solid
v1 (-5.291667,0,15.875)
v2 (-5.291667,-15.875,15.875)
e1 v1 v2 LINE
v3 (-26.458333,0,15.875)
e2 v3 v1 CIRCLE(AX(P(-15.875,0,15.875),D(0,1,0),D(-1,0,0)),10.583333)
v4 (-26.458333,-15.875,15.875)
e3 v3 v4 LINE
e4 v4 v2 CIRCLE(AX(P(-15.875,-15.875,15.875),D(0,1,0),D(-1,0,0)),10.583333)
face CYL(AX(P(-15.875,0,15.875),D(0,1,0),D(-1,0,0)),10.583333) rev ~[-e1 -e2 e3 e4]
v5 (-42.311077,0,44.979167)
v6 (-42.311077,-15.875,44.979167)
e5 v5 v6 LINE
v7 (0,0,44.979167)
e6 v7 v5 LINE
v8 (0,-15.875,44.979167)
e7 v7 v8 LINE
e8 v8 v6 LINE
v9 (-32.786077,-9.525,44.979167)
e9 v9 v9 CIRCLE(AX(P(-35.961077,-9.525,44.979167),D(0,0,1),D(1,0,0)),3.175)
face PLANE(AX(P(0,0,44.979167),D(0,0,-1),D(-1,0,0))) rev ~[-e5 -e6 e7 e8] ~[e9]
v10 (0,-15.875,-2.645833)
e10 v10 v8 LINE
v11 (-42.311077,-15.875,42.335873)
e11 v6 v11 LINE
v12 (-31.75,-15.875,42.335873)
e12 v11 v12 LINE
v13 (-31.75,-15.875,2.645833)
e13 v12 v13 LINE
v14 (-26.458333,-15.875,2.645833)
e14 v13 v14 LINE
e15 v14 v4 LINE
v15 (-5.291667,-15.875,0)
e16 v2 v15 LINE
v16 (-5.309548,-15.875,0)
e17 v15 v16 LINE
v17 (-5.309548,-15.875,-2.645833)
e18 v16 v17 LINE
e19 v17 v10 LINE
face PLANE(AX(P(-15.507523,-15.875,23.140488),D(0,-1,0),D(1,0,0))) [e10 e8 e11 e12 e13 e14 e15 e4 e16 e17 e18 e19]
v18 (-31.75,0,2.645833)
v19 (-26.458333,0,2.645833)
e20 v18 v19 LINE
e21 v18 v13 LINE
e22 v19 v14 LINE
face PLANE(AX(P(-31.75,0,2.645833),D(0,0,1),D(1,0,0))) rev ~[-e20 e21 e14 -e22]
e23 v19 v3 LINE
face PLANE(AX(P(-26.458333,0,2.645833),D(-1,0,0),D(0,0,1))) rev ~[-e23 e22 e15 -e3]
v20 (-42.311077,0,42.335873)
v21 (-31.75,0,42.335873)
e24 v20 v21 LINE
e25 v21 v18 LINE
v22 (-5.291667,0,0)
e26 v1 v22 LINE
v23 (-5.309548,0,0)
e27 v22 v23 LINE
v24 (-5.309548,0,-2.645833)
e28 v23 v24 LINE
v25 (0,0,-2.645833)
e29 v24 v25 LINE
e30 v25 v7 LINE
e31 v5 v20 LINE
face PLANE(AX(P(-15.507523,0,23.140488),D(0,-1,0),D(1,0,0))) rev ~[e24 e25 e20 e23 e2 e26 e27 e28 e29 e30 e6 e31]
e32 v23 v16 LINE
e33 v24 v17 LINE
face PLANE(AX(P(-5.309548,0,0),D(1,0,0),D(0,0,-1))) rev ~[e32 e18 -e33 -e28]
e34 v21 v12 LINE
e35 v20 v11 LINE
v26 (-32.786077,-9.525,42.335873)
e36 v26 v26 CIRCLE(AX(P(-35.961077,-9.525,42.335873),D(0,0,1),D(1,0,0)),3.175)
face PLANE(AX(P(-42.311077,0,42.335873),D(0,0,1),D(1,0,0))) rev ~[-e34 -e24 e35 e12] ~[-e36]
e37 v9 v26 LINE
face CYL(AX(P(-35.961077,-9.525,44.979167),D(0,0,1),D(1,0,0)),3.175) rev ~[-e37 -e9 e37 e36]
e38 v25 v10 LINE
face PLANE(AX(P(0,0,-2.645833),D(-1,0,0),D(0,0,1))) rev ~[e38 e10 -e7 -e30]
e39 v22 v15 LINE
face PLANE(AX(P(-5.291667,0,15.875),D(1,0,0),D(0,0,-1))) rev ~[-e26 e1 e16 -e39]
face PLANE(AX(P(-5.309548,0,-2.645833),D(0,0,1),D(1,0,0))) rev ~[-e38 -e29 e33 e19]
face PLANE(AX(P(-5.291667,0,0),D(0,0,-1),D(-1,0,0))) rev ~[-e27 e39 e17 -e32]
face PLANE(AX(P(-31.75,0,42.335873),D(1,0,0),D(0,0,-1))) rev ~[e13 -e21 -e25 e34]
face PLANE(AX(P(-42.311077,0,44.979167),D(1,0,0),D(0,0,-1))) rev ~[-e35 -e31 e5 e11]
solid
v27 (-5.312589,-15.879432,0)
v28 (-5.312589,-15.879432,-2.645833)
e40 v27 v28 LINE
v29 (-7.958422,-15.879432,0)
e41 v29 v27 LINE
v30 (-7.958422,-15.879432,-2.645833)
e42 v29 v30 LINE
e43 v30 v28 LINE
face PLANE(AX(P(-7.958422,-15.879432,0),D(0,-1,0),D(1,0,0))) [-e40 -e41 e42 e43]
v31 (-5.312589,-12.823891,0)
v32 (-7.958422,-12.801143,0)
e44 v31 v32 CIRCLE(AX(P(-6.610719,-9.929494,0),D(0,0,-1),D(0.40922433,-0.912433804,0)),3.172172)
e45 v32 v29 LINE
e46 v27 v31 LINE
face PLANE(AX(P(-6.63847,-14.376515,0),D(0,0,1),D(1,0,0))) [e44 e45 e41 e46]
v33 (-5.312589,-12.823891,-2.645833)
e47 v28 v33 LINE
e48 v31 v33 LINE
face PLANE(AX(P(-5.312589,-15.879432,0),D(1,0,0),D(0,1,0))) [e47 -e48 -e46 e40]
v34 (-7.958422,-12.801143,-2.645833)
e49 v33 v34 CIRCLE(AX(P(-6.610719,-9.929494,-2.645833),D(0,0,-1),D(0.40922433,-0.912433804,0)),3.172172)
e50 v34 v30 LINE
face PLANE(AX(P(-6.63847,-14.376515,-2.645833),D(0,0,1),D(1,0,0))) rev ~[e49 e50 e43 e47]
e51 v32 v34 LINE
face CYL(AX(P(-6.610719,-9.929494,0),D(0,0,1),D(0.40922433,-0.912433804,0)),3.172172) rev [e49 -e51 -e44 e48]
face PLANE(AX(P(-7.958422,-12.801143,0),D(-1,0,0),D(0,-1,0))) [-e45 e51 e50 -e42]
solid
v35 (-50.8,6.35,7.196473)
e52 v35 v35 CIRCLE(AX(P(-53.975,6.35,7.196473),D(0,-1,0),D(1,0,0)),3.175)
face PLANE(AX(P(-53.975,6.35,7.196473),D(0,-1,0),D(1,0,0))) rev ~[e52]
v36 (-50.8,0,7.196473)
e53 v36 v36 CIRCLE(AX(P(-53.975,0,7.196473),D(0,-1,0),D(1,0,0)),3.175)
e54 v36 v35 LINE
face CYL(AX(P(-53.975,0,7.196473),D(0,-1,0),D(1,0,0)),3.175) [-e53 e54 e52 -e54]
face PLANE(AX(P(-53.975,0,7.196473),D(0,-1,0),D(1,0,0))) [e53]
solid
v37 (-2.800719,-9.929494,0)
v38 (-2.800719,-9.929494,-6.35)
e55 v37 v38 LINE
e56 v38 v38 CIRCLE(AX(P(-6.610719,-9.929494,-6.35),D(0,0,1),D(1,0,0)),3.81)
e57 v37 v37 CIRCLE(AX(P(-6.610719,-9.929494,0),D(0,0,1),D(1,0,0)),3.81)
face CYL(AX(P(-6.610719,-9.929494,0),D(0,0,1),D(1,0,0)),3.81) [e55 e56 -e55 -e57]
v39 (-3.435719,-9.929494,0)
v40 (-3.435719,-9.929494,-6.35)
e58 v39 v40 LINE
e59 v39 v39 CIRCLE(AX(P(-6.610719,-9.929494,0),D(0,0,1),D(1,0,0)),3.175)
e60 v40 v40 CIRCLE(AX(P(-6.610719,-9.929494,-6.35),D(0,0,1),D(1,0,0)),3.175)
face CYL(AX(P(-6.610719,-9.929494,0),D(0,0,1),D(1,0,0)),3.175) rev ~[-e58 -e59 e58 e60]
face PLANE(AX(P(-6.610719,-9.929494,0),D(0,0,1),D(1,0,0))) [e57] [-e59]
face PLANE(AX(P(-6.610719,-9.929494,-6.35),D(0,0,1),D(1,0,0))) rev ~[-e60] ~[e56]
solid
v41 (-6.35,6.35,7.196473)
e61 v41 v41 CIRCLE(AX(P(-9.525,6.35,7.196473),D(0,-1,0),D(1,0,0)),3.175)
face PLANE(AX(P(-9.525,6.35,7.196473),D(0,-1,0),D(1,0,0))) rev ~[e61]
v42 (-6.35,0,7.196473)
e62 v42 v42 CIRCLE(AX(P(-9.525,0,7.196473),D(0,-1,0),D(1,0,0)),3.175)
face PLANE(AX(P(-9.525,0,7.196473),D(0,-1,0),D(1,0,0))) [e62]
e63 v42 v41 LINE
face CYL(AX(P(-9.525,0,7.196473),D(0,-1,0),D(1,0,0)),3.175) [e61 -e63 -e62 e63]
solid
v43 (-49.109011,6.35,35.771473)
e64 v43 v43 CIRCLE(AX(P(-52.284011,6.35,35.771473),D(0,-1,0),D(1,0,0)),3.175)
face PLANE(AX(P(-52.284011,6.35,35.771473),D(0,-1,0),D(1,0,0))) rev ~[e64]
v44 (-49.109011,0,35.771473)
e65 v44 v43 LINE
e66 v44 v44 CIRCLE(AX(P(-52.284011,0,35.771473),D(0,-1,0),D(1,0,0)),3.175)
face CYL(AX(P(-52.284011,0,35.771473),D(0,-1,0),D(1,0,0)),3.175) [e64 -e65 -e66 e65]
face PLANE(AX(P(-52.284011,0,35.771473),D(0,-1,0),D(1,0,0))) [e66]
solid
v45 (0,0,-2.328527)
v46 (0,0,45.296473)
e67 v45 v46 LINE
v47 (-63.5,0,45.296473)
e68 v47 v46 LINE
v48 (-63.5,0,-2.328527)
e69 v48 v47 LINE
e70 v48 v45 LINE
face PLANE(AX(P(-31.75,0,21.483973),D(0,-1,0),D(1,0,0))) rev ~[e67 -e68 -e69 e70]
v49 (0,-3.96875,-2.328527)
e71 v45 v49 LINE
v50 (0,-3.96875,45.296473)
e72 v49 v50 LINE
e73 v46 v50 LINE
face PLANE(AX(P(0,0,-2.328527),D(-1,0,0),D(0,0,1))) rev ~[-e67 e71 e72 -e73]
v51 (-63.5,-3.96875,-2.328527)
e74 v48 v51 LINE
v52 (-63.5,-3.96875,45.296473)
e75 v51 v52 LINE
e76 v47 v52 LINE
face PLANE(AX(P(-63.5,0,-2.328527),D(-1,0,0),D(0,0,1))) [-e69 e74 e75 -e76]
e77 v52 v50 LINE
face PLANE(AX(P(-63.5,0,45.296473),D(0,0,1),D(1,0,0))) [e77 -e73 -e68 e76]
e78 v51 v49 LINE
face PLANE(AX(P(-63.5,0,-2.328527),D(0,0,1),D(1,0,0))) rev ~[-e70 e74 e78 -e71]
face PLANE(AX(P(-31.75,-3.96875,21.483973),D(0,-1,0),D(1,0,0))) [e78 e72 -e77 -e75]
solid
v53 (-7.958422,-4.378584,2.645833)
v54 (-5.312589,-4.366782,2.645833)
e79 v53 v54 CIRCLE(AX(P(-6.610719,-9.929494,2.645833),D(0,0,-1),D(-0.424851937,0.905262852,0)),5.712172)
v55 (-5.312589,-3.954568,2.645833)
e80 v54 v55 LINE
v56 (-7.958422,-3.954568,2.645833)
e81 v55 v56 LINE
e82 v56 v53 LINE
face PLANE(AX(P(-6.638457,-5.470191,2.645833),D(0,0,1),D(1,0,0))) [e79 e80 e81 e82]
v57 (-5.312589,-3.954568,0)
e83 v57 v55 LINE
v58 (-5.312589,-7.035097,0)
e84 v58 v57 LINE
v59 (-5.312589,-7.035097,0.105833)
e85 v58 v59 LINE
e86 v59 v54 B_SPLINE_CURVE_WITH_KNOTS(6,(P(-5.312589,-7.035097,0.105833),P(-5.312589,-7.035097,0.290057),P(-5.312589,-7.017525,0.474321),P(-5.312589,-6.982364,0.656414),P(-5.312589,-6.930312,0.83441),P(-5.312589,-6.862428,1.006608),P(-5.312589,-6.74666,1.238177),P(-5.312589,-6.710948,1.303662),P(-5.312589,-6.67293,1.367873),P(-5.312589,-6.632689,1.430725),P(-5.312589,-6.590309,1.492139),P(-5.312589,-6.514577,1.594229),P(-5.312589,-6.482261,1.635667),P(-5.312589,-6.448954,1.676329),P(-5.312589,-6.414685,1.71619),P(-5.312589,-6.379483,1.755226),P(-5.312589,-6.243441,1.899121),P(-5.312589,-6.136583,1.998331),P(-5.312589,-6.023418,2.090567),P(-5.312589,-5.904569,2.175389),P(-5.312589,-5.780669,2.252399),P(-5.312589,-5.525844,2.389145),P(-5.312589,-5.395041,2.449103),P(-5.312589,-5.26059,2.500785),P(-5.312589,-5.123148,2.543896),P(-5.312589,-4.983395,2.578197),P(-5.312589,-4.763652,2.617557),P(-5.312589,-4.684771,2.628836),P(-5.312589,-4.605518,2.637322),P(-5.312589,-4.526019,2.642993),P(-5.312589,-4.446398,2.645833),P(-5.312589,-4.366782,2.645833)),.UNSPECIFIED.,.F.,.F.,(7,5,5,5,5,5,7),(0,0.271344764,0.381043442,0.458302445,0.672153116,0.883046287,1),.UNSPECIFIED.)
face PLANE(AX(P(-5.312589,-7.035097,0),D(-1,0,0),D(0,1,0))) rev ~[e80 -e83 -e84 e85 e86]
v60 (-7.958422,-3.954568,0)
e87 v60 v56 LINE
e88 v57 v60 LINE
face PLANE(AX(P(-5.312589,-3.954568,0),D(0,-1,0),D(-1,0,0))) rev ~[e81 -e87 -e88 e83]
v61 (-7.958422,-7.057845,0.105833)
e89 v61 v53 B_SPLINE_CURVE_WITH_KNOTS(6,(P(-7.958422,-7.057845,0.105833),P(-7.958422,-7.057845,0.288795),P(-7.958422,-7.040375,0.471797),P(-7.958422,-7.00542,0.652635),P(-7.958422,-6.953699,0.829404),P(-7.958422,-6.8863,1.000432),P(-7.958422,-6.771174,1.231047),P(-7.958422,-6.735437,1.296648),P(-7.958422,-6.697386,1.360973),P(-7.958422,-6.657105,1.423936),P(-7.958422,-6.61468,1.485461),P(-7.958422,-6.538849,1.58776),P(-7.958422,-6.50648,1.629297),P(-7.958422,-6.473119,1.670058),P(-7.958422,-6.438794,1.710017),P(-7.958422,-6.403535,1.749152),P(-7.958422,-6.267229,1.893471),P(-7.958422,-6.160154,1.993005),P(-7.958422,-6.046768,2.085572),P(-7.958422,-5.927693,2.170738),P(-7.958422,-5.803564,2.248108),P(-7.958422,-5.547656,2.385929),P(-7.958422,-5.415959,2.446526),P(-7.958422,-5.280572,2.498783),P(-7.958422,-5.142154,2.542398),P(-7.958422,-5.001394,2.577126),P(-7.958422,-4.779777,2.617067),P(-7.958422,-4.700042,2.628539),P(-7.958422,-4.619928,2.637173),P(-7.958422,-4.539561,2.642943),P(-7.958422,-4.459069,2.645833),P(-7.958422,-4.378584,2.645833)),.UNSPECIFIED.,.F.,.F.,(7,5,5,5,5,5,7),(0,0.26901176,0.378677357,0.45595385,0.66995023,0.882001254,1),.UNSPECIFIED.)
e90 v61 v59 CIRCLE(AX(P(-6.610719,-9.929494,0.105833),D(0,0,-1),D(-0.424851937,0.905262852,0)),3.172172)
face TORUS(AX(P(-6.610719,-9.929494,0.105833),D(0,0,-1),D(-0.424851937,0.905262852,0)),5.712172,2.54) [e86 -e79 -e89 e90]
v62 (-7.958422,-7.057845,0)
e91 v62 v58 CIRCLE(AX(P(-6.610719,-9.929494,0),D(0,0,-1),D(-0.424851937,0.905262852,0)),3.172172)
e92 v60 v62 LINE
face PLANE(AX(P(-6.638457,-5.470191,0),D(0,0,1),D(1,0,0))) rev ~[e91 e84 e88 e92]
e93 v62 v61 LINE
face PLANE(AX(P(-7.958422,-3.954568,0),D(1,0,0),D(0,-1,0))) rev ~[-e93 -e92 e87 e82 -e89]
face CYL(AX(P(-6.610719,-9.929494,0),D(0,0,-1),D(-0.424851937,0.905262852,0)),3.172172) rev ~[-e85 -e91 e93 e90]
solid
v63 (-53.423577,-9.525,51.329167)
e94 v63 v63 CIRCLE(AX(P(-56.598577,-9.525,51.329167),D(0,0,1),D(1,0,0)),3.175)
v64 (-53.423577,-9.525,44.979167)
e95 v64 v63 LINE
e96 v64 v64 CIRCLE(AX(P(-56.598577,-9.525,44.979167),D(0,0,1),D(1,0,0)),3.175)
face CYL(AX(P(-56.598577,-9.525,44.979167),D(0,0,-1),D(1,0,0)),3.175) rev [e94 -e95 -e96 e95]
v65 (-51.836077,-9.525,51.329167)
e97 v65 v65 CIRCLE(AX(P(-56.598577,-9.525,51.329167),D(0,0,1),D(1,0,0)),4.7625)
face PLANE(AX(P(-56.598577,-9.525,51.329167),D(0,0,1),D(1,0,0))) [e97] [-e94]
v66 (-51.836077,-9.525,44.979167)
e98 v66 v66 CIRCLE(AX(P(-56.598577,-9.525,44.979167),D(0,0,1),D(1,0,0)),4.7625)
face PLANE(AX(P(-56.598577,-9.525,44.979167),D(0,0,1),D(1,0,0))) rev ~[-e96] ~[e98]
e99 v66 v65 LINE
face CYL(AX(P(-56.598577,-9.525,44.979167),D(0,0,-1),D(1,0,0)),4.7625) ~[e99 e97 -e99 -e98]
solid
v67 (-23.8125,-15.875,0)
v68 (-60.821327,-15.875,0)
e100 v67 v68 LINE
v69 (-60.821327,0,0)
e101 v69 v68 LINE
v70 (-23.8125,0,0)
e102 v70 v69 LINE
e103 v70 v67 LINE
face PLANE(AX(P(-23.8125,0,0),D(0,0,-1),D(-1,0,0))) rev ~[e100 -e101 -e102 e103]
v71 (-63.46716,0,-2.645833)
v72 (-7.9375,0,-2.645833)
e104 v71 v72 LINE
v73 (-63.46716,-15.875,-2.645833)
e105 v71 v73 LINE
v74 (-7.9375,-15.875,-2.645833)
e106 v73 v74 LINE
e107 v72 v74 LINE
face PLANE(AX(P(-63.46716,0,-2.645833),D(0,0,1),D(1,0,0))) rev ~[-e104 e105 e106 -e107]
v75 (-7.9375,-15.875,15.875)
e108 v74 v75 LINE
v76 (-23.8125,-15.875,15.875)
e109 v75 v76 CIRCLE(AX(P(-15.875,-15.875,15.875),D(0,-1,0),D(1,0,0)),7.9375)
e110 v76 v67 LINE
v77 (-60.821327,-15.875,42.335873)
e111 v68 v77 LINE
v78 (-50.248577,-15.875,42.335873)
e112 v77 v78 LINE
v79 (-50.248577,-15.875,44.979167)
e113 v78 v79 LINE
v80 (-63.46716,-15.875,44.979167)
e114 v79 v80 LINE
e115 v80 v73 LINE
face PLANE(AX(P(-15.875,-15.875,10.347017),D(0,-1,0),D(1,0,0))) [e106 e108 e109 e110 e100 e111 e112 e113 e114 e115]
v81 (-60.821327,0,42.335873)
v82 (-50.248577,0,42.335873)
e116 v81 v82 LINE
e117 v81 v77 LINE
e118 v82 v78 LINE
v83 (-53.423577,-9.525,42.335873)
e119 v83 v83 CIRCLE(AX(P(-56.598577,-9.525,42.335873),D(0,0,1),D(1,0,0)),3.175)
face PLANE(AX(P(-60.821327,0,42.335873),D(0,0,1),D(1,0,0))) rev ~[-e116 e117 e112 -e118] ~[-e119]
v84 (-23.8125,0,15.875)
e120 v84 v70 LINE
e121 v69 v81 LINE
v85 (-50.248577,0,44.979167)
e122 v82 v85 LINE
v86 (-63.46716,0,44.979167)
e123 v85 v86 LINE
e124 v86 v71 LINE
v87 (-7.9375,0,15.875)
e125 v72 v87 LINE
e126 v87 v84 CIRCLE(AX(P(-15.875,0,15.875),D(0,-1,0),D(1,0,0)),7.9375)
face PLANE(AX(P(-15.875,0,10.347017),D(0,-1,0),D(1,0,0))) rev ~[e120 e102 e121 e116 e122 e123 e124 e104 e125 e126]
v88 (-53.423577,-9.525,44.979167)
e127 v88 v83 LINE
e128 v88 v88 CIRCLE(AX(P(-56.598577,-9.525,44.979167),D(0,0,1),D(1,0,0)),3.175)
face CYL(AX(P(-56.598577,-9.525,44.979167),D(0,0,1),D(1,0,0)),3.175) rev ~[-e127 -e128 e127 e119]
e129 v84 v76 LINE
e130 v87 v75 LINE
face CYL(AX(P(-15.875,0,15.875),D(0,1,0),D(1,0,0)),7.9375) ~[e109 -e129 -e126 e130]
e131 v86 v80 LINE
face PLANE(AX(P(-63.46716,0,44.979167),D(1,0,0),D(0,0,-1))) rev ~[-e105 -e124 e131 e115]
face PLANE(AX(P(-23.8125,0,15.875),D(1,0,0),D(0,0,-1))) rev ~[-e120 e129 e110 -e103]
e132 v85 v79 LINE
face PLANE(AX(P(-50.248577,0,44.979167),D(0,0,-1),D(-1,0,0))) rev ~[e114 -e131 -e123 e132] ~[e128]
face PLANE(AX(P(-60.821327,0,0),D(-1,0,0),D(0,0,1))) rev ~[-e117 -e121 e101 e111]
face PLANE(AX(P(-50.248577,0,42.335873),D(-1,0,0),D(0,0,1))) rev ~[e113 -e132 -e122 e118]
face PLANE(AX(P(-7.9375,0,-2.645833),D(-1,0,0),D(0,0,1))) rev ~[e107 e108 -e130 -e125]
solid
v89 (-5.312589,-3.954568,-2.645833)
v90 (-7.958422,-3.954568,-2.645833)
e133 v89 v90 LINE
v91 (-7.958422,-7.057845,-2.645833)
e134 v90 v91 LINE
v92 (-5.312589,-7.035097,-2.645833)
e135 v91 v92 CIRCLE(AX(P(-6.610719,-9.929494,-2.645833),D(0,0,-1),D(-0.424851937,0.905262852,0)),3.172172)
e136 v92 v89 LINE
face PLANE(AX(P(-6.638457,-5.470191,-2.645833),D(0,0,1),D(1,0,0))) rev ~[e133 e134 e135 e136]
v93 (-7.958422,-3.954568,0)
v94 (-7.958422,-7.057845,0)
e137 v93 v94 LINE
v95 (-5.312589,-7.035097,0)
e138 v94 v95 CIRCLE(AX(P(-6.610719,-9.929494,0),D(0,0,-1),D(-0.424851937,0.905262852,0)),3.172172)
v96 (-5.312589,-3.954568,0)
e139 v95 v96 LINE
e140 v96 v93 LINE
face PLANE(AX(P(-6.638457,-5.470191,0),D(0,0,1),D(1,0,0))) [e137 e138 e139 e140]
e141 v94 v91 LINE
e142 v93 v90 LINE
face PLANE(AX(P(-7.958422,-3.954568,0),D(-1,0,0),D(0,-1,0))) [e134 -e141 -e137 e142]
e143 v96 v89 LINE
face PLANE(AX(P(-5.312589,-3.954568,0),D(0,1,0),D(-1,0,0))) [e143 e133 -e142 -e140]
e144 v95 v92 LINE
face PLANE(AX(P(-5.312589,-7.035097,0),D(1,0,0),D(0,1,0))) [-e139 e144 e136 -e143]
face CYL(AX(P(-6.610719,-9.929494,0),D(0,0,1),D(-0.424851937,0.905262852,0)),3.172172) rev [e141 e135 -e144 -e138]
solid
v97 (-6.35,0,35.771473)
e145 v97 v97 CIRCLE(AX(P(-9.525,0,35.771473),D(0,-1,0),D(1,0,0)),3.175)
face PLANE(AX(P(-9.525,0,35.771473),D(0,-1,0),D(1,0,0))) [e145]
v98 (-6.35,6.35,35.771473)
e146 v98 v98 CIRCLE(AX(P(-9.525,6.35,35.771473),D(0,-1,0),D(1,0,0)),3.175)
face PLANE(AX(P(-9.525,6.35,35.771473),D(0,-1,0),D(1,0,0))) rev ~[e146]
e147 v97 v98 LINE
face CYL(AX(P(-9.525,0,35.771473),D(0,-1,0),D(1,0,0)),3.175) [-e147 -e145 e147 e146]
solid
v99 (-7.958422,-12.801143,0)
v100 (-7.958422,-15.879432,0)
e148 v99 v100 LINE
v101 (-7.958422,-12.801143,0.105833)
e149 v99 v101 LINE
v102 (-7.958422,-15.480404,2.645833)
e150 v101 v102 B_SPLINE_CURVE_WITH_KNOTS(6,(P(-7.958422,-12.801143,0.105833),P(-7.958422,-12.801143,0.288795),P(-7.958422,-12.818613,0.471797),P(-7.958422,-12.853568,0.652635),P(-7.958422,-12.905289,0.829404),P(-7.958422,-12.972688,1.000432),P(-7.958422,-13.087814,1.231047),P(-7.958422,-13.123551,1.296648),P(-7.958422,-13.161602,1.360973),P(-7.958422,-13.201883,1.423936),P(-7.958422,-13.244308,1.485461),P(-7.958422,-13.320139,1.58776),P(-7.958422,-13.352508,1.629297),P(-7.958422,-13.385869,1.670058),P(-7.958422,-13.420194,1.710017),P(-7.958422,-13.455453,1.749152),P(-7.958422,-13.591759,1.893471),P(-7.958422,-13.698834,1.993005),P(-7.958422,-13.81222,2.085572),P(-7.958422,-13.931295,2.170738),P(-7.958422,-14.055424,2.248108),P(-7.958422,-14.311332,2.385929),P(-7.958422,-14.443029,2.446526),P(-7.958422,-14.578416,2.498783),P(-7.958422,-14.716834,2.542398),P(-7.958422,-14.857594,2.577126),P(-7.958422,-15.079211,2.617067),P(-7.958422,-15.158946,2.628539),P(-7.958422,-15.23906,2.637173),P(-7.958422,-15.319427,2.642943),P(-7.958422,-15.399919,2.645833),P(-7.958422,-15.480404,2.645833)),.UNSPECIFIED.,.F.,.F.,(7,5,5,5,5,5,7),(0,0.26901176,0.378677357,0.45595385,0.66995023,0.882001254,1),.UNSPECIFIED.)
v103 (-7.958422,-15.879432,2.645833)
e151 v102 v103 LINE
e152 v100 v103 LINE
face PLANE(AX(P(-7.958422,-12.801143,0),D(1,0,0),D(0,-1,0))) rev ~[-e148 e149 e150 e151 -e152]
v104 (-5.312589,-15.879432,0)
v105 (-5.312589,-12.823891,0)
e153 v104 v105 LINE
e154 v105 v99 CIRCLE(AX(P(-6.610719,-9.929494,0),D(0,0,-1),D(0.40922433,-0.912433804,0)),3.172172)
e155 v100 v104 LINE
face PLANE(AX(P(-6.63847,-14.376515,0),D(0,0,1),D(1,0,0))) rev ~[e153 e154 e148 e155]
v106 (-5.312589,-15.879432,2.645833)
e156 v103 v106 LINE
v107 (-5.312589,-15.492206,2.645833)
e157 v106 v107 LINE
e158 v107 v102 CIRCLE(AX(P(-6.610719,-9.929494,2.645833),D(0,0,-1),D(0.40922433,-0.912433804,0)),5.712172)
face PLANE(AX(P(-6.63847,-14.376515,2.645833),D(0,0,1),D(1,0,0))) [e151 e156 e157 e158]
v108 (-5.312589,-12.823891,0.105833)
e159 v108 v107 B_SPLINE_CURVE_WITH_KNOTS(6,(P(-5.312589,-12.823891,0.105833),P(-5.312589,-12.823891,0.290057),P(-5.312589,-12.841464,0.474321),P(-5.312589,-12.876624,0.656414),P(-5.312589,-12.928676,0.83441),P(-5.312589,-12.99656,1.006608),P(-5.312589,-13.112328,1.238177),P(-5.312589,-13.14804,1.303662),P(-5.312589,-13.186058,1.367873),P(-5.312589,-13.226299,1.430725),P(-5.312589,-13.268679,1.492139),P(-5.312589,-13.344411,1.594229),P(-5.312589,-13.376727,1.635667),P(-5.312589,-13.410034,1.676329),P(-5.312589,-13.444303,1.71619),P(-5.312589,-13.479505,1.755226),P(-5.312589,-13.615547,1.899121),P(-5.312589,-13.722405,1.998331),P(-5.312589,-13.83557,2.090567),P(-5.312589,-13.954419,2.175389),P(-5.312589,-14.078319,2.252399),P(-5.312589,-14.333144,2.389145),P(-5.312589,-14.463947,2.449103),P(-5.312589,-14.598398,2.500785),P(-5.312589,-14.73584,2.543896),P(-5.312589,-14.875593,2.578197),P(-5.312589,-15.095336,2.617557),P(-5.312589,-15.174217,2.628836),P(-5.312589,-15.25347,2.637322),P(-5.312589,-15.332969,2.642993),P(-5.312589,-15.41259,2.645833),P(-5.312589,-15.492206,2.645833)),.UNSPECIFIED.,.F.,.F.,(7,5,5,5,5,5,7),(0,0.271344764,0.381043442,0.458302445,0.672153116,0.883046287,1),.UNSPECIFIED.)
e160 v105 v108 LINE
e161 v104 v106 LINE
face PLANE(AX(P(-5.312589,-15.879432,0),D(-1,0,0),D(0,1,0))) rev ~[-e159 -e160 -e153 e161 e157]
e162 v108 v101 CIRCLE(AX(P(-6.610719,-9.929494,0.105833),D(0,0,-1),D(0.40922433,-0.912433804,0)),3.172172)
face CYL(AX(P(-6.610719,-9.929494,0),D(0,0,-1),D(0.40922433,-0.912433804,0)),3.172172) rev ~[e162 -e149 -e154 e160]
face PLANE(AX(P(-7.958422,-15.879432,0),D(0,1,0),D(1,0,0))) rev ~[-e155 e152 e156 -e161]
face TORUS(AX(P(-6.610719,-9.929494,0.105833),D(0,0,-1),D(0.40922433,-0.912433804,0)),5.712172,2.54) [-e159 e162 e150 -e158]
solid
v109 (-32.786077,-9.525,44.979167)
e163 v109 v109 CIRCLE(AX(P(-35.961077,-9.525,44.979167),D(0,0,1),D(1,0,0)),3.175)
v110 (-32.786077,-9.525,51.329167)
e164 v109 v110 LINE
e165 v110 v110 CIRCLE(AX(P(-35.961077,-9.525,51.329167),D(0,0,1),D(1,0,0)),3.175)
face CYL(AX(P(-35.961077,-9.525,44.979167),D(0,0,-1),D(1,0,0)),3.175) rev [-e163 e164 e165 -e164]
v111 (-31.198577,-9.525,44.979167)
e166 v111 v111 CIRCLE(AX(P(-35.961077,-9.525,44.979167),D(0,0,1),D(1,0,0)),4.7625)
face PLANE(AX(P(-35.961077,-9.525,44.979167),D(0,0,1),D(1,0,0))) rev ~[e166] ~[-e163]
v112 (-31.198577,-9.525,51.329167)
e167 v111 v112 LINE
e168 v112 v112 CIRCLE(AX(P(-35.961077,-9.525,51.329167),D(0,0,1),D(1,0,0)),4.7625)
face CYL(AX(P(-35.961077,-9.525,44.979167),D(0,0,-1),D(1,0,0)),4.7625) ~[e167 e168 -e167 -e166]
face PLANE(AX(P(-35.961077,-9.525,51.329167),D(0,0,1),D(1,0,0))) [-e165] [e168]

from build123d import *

# Parameters (mm, degrees)
F1_DEPTH  = 15.875
F0_W      = 2.6458333332
F0_H      = 42.3358732487
F2_W      = 63.5
F2_H      = 47.625
F2_R      = 3.175
F3_DEPTH  = 3.96875
F4_DEPTH  = 6.35
F5_R      = 4.7625
F5_R_2    = 3.175
F6_DEPTH  = 6.35
F7_R      = 3.175
F8_DEPTH  = 25.4
F9_R      = 3.81
F9_R_2    = 3.175
F10_DEPTH = 6.35
F12_DEPTH = 2.645833164
F13_DEPTH = 2.6458333316
F14_R     = 2.54
F14_2_R   = 2.54


# Not quite as in the source:
# - a feature names something its author has since deleted; it is built from what else it names


with BuildPart() as f1:
    # F0 (on Front) → F1 (new body)
    with BuildSketch(Plane.XZ):
        with BuildLine():
            Line((0, 44.979166582), (-31.75, 44.979166582))
            Line((-31.75, 44.979166582), (-31.75, 42.3358732487))
            Line((-31.75, 42.3358732487), (-31.75, 2.6458333332))
            Line((-31.75, 2.6458333332), (-26.4583333333, 2.6458333332))
            Line((-26.4583333333, 2.6458333332), (-26.4583333333, 15.875))
            ThreePointArc((-26.4583333333, 15.875), (-15.875, 26.4583333333), (-5.2916666667, 15.875))
            Line((-5.2916666667, 15.875), (-5.2916666667, 0))
            Line((-5.2916666667, 0), (0, 0))
            Line((0, 0), (0, 44.979166582))
        make_face()
        Polygon((0, -2.6458333333), (0, 0), (-5.2916666667, 0), (-5.309548229, 0), (-5.309548229, -2.6458333333), align=None)
        Polygon((-31.75, 42.3358732487), (-31.75, 44.979166582), (-34.3958333316, 44.979166582), (-37.0416664956, 44.979166582), (-42.3110765377, 44.979166582), (-42.3110765377, 42.3358732487), (-37.0416664956, 42.3358732487), (-34.3958333316, 42.3358732487), align=None)
    extrude(amount=F1_DEPTH)


with BuildPart() as f1b:
    # F0 (on Front) → F1, piece 2 (new body)
    with BuildSketch(Plane.XZ):
        with BuildLine():
            Line((-23.8125, 0), (-7.9375, 0))
            Line((-7.9375, 0), (-7.9375, 15.875))
            ThreePointArc((-7.9375, 15.875), (-15.875, 23.8125), (-23.8125, 15.875))
            Line((-23.8125, 15.875), (-23.8125, 0))
        make_face()
        Polygon((-26.4583333333, 0), (-31.75, 0), (-60.8213265341, 0), (-63.4671598673, 0), (-63.4671598673, -2.6458333333), (-7.9375, -2.6458333333), (-7.9375, 0), (-23.8125, 0), align=None)
        with Locations((-62.1442432007, 21.1679366243)):
            Rectangle(F0_W, F0_H)
        Polygon((-50.2485765377, 42.3358732487), (-50.2485765377, 44.979166582), (-55.5296598693, 44.979166582), (-58.175493201, 44.979166582), (-63.4671598673, 44.979166582), (-63.4671598673, 42.3358732487), (-60.8213265341, 42.3358732487), (-58.175493201, 42.3358732487), (-55.5296598693, 42.3358732487), align=None)
    extrude(amount=F1_DEPTH)


with BuildPart() as f3:
    # F2 (on Front) → F3 (new body)
    with BuildSketch(Plane.XZ):
        with Locations((-31.75, 21.4839725468)):
            Rectangle(F2_W, F2_H)
        with Locations((-53.975, 7.1964725468)):
            Circle(F2_R, mode=Mode.SUBTRACT)
        with Locations((-9.525, 7.1964725468)):
            Circle(F2_R, mode=Mode.SUBTRACT)
        with Locations((-52.284011212, 35.7714725468)):
            Circle(F2_R, mode=Mode.SUBTRACT)
        with Locations((-9.525, 35.7714725468)):
            Circle(F2_R, mode=Mode.SUBTRACT)
        with Locations((-52.284011212, 35.7714725468)):
            Circle(F2_R)
        with Locations((-53.975, 7.1964725468)):
            Circle(F2_R)
        with Locations((-9.525, 7.1964725468)):
            Circle(F2_R)
        with Locations((-9.525, 35.7714725468)):
            Circle(F2_R)
    extrude(amount=F3_DEPTH)


with BuildPart() as f4:
    # F2 (on Front) → F4 (new body)
    with BuildSketch(Plane.XZ):
        with Locations((-9.525, 35.7714725468)):
            Circle(F2_R)
    extrude(amount=-F4_DEPTH)


with BuildPart() as f4b:
    # F2 (on Front) → F4, piece 2 (new body)
    with BuildSketch(Plane.XZ):
        with Locations((-52.284011212, 35.7714725468)):
            Circle(F2_R)
    extrude(amount=-F4_DEPTH)


with BuildPart() as f4c:
    # F2 (on Front) → F4, piece 3 (new body)
    with BuildSketch(Plane.XZ):
        with Locations((-9.525, 7.1964725468)):
            Circle(F2_R)
    extrude(amount=-F4_DEPTH)


with BuildPart() as f4d:
    # F2 (on Front) → F4, piece 4 (new body)
    with BuildSketch(Plane.XZ):
        with Locations((-53.975, 7.1964725468)):
            Circle(F2_R)
    extrude(amount=-F4_DEPTH)


with BuildPart() as f6:
    # F5 (on face) → F6 (new body)
    with BuildSketch(Plane.XY.offset(44.979166582)):
        with Locations((-56.5985765377, -9.525)):
            Circle(F5_R)
        with Locations((-56.5985765377, -9.525)):
            Circle(F5_R_2, mode=Mode.SUBTRACT)
    extrude(amount=F6_DEPTH)


with BuildPart() as f6b:
    # F5 (on face) → F6, piece 2 (new body)
    with BuildSketch(Plane.XY.offset(44.979166582)):
        with Locations((-35.9610765377, -9.525)):
            Circle(F5_R)
        with Locations((-35.9610765377, -9.525)):
            Circle(F5_R_2, mode=Mode.SUBTRACT)
    extrude(amount=F6_DEPTH)


with BuildPart() as f8_tool:
    # F7 (on face) → F8 (new body)
    with BuildSketch(Plane.XY.offset(44.979166582)):
        with Locations((-35.9610765377, -9.525)):
            Circle(F7_R)
        with Locations((-56.5985765377, -9.525)):
            Circle(F7_R)
    extrude(amount=-F8_DEPTH)


with BuildPart() as f1_1:
    add(f1.part)

    # F8: cut by f8_tool
    add(f8_tool.part, mode=Mode.SUBTRACT)


with BuildPart() as f1b_1:
    add(f1b.part)

    # F8: cut by f8_tool
    add(f8_tool.part, mode=Mode.SUBTRACT)


with BuildPart() as f10:
    # F9 (on Top) → F10 (new body)
    with BuildSketch(Plane.XY):
        with Locations((-6.6107190214, -9.929494001)):
            Circle(F9_R)
        with Locations((-6.6107190214, -9.929494001)):
            Circle(F9_R_2, mode=Mode.SUBTRACT)
    extrude(amount=-F10_DEPTH)


with BuildPart() as f12:
    # F11 (on Top) → F12 (new body)
    with BuildSketch(Plane.XY):
        with BuildLine():
            Line((-7.958422415, -12.8011434192), (-7.958422415, -15.8794317394))
            Line((-7.958422415, -15.8794317394), (-5.3125890833, -15.8794317394))
            Line((-5.3125890833, -15.8794317394), (-5.3125890833, -12.8238909126))
            ThreePointArc((-5.3125890833, -12.8238909126), (-6.6379906914, -13.1015487096), (-7.958422415, -12.8011434192))
        make_face()
    extrude(amount=F12_DEPTH)


with BuildPart() as f12b:
    # F11 (on Top) → F12, piece 2 (new body)
    with BuildSketch(Plane.XY):
        with BuildLine():
            Line((-7.958422415, -3.9545679465), (-7.958422415, -7.0578445827))
            ThreePointArc((-7.958422415, -7.0578445827), (-6.6379906914, -6.7574392924), (-5.3125890833, -7.0350970893))
            Line((-5.3125890833, -7.0350970893), (-5.3125890833, -3.9545679465))
            Line((-5.3125890833, -3.9545679465), (-7.958422415, -3.9545679465))
        make_face()
    extrude(amount=F12_DEPTH)


with BuildPart() as f13:
    # F13 (new): a face of the model
    f13_faces = [f12.part.faces().sort_by_distance(p)[0] for p in [
        (-6.6371842751, -14.4419575778, 0),
    ]]
    extrude(f13_faces, amount=F13_DEPTH)


with BuildPart() as f13b:
    # F13#2 (new): a face of the model
    f13_2_faces = [f12b.part.faces().sort_by_distance(p)[0] for p in [
        (-6.6371697987, -5.4045252139, 0),
    ]]
    extrude(f13_2_faces, amount=F13_DEPTH)


with BuildPart() as f12b_1:
    add(f12b.part)

    # F14
    f14_edges = [f12b_1.edges().sort_by_distance(p)[0] for p in [
        (-6.637991, -6.757439, 2.645833),
    ]]
    fillet(f14_edges, radius=F14_R)


with BuildPart() as f12_1:
    add(f12.part)

    # F14#2
    f14_2_edges = [f12_1.edges().sort_by_distance(p)[0] for p in [
        (-6.637991, -13.101549, 2.645833),
    ]]
    fillet(f14_2_edges, radius=F14_2_R)


solid = Compound([f3.part, f4.part, f4b.part, f4c.part, f4d.part, f6.part, f6b.part, f1_1.part, f1b_1.part, f10.part, f13.part, f13b.part, f12b_1.part, f12_1.part])
